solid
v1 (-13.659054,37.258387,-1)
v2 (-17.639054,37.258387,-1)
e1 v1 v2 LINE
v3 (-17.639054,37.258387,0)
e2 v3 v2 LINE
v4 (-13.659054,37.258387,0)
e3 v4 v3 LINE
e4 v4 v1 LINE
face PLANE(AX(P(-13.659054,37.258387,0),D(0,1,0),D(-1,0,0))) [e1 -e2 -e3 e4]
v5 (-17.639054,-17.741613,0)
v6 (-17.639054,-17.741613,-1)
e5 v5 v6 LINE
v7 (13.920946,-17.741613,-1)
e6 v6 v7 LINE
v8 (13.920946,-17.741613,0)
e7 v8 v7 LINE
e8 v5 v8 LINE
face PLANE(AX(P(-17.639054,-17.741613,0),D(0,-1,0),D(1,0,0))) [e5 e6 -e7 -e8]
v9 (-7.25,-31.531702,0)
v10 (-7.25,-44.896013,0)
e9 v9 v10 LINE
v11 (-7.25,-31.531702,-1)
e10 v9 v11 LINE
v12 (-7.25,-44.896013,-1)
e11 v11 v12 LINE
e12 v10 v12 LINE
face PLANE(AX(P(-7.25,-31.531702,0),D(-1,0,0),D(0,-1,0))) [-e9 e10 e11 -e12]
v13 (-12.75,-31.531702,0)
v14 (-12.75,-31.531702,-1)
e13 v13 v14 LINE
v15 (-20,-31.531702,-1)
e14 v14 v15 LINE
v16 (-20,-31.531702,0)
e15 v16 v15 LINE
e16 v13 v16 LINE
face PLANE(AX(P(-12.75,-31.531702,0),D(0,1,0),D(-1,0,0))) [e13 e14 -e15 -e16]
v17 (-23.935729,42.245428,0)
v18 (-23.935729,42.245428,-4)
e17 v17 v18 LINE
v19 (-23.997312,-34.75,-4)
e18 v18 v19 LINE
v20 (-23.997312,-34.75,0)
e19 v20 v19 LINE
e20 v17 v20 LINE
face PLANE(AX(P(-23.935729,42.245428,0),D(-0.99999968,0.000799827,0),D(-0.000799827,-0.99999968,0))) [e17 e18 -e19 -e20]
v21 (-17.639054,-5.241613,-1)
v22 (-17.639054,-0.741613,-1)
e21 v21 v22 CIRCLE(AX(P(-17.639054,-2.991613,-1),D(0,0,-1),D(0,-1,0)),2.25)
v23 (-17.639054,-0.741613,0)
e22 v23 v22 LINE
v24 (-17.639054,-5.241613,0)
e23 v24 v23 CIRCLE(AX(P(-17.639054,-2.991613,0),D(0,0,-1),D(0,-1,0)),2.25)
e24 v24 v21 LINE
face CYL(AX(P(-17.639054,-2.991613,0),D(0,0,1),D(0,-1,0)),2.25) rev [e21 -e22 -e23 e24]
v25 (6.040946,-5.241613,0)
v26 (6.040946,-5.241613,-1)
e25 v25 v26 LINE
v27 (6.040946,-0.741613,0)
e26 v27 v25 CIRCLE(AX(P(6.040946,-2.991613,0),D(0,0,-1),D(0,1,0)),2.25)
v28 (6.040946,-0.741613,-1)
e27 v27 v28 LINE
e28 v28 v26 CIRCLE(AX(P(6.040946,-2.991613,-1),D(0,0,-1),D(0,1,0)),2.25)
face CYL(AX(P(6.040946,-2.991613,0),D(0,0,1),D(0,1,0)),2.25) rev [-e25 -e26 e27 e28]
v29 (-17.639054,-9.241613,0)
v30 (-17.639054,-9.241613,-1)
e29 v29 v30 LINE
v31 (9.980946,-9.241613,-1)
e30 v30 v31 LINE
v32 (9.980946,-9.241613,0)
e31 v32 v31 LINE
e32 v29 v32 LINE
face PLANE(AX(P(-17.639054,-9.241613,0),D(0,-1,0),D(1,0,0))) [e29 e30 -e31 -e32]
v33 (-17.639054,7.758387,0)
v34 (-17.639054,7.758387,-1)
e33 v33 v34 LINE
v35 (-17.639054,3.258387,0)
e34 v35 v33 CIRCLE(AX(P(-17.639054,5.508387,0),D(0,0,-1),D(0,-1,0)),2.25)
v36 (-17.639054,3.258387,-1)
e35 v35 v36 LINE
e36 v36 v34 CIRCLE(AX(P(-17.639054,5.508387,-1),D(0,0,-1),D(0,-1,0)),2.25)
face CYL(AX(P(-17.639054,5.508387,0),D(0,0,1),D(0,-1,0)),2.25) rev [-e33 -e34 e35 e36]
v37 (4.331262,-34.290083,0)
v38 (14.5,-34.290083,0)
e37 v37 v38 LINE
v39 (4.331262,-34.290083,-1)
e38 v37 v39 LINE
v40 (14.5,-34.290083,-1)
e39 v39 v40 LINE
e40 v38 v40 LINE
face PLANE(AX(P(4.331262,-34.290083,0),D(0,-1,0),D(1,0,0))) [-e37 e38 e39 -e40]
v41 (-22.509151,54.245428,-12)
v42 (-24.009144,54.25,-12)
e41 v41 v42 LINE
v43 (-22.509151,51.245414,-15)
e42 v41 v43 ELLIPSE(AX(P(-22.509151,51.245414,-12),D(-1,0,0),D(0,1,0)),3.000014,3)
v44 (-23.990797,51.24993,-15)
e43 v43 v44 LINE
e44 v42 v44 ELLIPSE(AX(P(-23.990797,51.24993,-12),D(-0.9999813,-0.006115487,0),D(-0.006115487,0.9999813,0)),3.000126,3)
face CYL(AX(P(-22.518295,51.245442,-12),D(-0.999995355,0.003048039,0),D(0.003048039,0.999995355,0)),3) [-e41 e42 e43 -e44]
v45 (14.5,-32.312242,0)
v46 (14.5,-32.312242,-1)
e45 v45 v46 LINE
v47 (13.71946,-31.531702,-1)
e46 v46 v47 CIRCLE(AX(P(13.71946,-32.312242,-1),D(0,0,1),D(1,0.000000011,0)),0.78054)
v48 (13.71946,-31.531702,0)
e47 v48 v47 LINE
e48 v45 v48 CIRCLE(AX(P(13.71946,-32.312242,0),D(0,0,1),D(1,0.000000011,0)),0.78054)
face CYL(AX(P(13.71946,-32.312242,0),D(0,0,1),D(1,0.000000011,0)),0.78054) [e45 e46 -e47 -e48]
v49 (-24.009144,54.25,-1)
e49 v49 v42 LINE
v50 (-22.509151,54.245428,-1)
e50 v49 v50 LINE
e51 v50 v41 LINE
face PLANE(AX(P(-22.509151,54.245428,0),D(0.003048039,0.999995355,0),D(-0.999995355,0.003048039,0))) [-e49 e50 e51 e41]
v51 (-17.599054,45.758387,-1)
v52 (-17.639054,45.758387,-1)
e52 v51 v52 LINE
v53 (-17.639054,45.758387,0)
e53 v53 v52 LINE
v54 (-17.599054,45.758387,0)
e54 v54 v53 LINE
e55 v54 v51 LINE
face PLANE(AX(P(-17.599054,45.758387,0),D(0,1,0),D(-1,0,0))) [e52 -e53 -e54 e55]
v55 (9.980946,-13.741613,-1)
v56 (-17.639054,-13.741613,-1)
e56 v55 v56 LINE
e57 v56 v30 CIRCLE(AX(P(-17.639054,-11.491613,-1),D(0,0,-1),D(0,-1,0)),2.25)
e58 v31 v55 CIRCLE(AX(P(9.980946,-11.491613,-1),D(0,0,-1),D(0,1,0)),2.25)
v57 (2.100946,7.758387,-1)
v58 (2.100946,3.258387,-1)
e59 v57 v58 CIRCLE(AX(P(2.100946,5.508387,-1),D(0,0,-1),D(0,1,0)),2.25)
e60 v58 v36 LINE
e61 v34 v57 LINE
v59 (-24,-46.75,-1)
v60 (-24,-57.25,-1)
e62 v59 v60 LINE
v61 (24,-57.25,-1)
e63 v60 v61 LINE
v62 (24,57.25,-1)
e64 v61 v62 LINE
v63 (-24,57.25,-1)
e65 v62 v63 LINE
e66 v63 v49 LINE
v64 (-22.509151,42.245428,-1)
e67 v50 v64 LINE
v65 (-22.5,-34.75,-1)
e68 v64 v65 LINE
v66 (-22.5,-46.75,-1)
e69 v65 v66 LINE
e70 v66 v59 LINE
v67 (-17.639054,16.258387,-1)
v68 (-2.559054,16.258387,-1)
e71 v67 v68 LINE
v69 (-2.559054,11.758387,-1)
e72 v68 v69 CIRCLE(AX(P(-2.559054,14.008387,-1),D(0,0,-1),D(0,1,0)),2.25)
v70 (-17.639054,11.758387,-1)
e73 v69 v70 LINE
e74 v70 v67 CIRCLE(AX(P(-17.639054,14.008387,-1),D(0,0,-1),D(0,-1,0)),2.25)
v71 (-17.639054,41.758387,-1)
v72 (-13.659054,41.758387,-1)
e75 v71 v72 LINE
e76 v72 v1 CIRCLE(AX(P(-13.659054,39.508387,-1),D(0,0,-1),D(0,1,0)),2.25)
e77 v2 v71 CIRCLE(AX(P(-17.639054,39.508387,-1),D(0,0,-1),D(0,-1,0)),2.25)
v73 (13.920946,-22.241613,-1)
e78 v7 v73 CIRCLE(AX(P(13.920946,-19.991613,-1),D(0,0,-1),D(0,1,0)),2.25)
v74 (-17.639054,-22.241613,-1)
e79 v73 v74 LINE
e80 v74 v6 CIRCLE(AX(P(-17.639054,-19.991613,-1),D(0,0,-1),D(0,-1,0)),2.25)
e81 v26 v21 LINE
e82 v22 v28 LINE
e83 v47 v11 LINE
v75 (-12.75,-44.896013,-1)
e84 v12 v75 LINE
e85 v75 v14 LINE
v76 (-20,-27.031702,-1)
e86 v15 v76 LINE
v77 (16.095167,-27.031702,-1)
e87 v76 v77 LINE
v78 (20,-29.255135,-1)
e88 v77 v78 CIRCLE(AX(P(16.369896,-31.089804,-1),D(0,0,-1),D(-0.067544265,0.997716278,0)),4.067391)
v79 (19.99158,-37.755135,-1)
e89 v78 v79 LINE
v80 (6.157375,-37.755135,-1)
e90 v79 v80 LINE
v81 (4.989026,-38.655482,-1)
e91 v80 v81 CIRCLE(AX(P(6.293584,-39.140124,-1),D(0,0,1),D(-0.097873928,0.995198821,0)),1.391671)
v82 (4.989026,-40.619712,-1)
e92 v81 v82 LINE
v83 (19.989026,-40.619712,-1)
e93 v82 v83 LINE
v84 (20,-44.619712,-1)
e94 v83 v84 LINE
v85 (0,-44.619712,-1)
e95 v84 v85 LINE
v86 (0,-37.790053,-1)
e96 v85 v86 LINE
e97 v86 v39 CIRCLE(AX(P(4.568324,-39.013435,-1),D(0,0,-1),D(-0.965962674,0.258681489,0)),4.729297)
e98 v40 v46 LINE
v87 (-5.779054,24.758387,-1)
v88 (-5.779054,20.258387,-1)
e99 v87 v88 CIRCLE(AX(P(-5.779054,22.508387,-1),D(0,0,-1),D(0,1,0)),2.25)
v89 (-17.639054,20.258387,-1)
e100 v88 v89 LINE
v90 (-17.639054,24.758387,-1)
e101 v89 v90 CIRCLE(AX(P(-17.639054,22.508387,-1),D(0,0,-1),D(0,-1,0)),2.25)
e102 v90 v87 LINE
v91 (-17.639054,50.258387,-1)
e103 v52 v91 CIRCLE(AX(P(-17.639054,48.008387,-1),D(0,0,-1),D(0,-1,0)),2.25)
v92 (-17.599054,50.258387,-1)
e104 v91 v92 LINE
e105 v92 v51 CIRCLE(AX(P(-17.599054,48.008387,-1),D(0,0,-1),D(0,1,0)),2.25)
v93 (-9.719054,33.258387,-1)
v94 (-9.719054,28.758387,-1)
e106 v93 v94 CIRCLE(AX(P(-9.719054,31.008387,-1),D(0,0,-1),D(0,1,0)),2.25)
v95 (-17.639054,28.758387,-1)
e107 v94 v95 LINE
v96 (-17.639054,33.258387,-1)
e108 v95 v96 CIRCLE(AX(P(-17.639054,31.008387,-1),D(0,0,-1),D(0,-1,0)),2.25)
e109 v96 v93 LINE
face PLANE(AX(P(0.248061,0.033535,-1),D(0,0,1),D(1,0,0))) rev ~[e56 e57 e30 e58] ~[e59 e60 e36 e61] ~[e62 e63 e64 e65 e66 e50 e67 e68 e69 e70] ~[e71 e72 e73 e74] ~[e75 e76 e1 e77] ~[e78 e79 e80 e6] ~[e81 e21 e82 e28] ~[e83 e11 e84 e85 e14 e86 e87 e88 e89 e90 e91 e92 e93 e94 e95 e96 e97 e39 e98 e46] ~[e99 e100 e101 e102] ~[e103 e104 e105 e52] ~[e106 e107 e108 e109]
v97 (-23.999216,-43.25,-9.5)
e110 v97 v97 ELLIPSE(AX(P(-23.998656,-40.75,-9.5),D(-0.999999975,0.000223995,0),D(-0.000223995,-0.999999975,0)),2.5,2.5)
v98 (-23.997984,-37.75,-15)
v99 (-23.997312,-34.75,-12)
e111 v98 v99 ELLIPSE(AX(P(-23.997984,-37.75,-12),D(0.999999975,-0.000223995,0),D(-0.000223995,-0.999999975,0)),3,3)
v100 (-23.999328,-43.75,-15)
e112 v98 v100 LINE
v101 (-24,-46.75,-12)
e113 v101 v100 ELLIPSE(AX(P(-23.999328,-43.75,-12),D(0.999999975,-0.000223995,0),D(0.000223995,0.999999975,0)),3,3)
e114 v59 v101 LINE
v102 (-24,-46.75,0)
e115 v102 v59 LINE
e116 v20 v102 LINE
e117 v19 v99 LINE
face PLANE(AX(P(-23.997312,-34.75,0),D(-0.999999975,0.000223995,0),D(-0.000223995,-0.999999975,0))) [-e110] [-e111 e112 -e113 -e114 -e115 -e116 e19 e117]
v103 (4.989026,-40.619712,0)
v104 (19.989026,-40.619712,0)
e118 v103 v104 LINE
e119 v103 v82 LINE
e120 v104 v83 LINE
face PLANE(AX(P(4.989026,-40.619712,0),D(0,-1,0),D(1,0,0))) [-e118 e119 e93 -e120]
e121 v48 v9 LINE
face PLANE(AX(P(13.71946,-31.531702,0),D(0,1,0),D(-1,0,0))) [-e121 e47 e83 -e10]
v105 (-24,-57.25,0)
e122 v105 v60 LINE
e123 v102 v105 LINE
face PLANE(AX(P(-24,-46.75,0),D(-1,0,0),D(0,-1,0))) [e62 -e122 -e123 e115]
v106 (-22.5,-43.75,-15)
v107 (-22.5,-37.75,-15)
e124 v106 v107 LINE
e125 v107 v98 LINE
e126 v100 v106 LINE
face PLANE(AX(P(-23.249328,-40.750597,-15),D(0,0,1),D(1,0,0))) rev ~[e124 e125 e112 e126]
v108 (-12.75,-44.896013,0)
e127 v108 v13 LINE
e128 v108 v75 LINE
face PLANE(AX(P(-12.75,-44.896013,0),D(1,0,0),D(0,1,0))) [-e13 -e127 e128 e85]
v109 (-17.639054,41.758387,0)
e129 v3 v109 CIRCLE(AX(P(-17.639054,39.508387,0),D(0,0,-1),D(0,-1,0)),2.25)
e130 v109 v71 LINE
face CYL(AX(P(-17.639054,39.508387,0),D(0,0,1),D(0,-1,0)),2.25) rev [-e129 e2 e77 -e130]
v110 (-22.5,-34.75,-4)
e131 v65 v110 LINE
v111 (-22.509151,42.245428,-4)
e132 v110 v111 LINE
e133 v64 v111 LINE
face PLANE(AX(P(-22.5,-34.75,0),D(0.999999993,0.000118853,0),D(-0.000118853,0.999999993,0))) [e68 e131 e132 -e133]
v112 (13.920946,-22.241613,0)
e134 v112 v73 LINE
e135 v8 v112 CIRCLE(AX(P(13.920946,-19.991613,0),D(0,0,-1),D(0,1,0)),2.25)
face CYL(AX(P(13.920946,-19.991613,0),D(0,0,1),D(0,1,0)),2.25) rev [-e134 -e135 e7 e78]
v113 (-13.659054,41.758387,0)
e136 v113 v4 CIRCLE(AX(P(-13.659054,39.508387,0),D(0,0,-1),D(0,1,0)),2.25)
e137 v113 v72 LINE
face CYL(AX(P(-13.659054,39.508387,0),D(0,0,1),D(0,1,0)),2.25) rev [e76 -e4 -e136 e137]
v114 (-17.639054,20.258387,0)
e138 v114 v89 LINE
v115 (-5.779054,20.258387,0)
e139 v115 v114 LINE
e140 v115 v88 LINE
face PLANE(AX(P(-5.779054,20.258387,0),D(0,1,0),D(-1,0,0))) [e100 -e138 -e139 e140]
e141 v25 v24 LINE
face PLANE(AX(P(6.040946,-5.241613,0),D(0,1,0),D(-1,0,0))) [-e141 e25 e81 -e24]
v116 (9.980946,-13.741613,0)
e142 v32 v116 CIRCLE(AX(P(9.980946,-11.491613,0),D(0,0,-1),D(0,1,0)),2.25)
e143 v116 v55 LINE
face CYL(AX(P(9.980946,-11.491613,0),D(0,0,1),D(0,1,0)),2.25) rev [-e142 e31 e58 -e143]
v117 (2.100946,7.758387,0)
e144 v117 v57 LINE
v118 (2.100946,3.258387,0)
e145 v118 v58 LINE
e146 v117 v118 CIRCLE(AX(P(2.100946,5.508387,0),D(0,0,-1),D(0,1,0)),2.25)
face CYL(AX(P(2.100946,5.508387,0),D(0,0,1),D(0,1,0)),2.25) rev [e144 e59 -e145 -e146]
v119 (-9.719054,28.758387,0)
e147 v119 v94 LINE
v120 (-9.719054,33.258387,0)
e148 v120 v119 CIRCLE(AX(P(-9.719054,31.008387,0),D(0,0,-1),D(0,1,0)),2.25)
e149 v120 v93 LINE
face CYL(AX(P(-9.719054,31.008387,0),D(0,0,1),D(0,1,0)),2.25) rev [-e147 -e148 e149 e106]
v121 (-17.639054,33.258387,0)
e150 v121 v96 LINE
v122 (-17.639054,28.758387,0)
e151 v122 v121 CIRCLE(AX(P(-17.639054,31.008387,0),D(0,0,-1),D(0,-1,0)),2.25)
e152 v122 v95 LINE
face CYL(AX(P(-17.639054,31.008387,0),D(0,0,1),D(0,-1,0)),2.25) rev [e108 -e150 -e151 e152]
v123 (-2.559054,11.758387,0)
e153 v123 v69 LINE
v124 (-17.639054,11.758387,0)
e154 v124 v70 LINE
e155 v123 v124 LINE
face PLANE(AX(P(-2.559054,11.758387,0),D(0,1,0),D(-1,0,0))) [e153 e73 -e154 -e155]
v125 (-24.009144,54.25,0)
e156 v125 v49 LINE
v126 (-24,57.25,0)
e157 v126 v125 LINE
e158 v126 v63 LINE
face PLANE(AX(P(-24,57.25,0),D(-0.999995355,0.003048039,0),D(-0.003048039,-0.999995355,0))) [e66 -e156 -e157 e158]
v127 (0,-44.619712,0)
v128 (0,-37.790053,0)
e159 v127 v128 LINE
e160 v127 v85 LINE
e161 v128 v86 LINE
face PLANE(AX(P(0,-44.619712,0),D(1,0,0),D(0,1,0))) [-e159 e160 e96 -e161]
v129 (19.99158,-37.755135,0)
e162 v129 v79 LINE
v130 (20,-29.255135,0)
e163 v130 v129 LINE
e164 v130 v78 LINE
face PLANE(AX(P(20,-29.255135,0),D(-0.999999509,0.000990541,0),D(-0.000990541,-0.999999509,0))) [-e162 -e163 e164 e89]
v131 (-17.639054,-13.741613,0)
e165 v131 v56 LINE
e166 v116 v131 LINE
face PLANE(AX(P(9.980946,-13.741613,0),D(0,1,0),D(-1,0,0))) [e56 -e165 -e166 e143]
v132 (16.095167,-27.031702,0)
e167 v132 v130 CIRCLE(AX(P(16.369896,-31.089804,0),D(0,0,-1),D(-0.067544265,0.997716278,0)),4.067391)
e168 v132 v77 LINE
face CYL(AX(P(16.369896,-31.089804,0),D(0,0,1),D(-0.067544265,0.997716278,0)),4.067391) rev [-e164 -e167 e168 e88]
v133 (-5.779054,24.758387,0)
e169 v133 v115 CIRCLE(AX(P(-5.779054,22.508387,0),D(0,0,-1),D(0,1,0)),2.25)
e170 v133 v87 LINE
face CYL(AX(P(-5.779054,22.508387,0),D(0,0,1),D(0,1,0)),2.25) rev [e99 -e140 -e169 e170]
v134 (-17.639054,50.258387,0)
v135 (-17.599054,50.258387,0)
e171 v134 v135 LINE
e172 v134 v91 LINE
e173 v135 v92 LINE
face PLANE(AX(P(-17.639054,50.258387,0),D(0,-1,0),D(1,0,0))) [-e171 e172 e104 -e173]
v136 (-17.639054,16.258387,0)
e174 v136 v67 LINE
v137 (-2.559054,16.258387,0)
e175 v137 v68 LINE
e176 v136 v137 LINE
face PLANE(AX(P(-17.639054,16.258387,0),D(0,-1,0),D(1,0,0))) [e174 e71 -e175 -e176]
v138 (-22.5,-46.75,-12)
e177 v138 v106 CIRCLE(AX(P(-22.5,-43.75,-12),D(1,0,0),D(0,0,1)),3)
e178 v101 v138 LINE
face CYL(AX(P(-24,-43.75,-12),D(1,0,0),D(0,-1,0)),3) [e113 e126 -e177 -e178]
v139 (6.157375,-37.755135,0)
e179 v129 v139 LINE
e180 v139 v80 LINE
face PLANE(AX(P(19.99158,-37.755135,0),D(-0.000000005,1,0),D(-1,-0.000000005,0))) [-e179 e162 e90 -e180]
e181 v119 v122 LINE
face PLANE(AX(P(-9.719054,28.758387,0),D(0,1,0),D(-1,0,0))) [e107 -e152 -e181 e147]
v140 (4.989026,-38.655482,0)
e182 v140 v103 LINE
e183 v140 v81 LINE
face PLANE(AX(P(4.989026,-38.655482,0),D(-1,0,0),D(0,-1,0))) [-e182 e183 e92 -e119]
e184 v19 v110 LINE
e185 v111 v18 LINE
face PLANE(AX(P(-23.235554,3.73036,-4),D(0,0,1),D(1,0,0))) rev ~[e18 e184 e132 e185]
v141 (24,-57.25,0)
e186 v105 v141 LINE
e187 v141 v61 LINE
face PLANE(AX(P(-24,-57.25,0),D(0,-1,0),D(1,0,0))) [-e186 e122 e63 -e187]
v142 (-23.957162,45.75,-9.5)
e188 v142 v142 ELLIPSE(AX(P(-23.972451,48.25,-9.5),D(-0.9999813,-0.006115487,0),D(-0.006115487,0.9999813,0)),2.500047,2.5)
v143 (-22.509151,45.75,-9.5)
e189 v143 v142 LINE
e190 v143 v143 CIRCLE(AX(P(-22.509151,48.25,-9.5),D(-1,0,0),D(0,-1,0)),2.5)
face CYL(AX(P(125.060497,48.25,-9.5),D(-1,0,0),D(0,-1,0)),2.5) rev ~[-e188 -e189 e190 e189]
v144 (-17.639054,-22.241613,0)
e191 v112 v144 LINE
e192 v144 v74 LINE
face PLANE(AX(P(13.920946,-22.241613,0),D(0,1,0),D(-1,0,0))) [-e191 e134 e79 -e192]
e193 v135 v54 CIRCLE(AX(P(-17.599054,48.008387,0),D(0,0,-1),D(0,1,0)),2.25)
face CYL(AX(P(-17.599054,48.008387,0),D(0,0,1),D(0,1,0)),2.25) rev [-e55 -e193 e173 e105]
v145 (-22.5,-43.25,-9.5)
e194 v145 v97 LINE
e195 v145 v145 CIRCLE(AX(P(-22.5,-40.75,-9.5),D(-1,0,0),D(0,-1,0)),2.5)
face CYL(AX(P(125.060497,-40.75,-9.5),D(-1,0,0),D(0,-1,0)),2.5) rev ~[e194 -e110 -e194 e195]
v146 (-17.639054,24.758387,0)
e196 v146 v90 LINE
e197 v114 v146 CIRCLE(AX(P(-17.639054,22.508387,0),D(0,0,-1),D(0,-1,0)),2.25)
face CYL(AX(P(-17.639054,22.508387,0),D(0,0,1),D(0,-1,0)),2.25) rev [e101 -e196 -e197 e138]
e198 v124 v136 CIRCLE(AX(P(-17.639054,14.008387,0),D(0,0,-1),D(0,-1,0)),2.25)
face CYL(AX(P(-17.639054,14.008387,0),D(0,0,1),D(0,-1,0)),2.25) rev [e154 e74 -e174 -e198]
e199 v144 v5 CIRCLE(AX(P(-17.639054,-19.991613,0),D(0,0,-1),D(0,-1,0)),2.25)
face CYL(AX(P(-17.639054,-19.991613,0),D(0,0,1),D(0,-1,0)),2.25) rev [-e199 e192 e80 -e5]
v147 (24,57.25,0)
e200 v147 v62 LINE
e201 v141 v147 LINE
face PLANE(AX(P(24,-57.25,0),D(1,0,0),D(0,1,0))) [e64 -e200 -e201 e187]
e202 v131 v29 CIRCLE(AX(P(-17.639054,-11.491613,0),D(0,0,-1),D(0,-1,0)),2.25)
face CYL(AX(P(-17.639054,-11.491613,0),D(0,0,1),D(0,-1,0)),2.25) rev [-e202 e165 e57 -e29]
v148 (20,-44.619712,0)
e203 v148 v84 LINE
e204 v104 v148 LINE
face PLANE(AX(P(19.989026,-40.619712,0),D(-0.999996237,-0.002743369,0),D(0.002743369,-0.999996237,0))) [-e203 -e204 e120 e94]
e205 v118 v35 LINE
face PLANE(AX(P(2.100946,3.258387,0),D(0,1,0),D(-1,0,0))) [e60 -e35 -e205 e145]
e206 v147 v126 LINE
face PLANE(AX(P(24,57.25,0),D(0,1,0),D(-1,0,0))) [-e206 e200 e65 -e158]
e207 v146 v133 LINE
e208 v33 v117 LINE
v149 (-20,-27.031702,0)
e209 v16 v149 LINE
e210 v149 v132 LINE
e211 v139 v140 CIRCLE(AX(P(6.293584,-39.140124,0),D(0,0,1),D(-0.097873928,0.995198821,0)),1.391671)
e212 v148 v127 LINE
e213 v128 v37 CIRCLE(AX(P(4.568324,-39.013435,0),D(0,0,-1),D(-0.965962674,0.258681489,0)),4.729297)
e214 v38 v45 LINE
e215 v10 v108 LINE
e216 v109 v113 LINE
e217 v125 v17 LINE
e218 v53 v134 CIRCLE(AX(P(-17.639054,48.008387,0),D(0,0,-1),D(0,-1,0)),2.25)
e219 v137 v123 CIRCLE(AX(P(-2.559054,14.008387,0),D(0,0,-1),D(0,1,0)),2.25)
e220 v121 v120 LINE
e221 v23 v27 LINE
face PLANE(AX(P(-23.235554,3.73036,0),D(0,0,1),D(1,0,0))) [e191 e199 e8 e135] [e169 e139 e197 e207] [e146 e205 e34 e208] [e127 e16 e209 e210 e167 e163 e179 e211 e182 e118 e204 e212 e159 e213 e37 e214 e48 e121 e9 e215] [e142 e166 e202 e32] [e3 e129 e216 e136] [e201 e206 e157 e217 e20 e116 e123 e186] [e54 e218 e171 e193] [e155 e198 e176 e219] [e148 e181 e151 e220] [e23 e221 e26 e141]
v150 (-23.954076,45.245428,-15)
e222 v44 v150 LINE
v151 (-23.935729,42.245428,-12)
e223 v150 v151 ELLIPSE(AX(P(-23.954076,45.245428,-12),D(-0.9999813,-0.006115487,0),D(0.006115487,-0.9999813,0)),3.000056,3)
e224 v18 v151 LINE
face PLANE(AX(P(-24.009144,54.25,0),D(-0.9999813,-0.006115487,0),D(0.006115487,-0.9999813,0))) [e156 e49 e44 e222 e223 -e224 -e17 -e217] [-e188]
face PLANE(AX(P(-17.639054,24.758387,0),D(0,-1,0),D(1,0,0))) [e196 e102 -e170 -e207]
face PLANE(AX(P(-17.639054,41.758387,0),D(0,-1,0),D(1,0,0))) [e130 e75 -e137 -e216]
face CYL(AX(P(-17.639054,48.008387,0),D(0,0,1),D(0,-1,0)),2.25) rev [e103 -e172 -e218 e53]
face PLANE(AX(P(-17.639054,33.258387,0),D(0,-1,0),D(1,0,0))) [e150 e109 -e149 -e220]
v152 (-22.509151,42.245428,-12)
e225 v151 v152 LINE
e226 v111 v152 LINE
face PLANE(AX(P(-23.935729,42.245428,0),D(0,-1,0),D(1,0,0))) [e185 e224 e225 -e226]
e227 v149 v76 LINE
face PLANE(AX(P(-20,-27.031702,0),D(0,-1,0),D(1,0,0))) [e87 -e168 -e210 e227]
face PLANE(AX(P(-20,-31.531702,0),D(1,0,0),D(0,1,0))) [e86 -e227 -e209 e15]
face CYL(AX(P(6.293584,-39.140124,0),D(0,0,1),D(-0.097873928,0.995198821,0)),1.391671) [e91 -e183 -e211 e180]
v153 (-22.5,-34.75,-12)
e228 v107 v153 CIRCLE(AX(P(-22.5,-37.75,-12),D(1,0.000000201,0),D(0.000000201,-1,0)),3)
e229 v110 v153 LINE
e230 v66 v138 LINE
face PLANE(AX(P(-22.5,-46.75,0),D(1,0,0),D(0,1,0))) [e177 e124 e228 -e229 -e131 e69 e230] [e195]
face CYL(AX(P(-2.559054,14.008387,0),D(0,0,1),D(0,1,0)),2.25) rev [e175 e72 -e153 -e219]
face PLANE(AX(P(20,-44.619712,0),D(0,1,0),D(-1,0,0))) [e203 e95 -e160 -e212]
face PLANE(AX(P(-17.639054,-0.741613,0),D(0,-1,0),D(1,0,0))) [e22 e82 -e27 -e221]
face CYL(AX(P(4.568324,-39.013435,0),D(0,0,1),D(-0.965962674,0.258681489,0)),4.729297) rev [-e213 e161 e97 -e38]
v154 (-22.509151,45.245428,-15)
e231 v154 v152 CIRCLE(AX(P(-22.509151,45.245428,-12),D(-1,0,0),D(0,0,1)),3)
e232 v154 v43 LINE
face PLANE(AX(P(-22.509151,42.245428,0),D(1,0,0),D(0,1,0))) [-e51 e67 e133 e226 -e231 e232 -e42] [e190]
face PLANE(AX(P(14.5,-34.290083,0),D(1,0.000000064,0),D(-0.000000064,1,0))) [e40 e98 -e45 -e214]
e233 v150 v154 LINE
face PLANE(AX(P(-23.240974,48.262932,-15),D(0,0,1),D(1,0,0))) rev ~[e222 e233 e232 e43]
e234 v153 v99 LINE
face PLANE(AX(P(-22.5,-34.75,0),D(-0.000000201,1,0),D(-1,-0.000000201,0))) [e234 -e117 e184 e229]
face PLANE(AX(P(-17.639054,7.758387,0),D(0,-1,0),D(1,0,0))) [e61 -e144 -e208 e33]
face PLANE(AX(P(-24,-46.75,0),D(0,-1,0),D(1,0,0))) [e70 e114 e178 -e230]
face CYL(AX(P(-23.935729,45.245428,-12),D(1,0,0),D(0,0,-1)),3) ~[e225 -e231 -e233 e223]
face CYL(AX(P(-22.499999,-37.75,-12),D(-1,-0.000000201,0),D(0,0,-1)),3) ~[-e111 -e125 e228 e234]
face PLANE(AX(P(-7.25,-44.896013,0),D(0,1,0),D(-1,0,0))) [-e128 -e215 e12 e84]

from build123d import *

# Parameters (mm, degrees)
F1_DEPTH = 1
F2_DEPTH = 15
F4_D     = 5
F5_R     = 3
F6_DEPTH = 4


# Not quite as in the source:
# - a feature names something its author has since deleted; it is built from what else it names


with BuildPart() as f1:
    # F0 (on Top) → F1 (new body)
    with BuildSketch(Plane.XY):
        Polygon((24, 57.25), (-24, 57.25), (-24.0091441598, 54.25), (-22.5091511277, 54.2454279414), (-22.5091511277, 42.2454279414), (-22.5, -34.75), (-22.5, -46.75), (-24, -46.75), (-24, -57.25), (24, -57.25), align=None)
        with BuildLine():
            Line((13.9209458456, -22.2416133583), (-17.6390541544, -22.2416133583))
            ThreePointArc((-17.6390541544, -22.2416133583), (-19.8890541544, -19.9916133583), (-17.6390541544, -17.7416133583))
            Line((-17.6390541544, -17.7416133583), (13.9209458456, -17.7416133583))
            ThreePointArc((13.9209458456, -17.7416133583), (16.1709458456, -19.9916133583), (13.9209458456, -22.2416133583))
        make_face(mode=Mode.SUBTRACT)
        with BuildLine():
            Line((9.9809458456, -13.7416133583), (-17.6390541544, -13.7416133583))
            ThreePointArc((-17.6390541544, -13.7416133583), (-19.8890541544, -11.4916133583), (-17.6390541544, -9.2416133583))
            Line((-17.6390541544, -9.2416133583), (9.9809458456, -9.2416133583))
            ThreePointArc((9.9809458456, -9.2416133583), (12.2309458456, -11.4916133583), (9.9809458456, -13.7416133583))
        make_face(mode=Mode.SUBTRACT)
        with BuildLine():
            Line((6.0409458456, -5.2416133583), (-17.6390541544, -5.2416133583))
            ThreePointArc((-17.6390541544, -5.2416133583), (-19.8890541544, -2.9916133583), (-17.6390541544, -0.7416133583))
            Line((-17.6390541544, -0.7416133583), (6.0409458456, -0.7416133583))
            ThreePointArc((6.0409458456, -0.7416133583), (8.2909458456, -2.9916133583), (6.0409458456, -5.2416133583))
        make_face(mode=Mode.SUBTRACT)
        with BuildLine():
            Line((-19.9999999992, -31.5317022603), (-19.9999999992, -27.0317022603))
            Line((-19.9999999992, -27.0317022603), (16.0951670268, -27.0317022603))
            ThreePointArc((16.0951670268, -27.0317022603), (18.3824934665, -27.555243649), (19.9999999704, -29.25513498))
            Line((19.9999999704, -29.25513498), (19.991580365, -37.75513498))
            Line((19.991580365, -37.75513498), (6.1573753969, -37.7551350426))
            ThreePointArc((6.1573753969, -37.7551350426), (5.4441089744, -38.037790108), (4.9890264818, -38.6554816172))
            Line((4.9890264818, -38.6554816172), (4.9890264818, -40.6197120801))
            Line((4.9890264818, -40.6197120801), (19.9890264818, -40.6197120801))
            Line((19.9890264818, -40.6197120801), (20, -44.6197120801))
            Line((20, -44.6197120801), (0, -44.6197120801))
            Line((0, -44.6197120801), (0, -37.7900532508))
            ThreePointArc((0, -37.7900532508), (1.5958871284, -35.3350022858), (4.3312619815, -34.2900834468))
            Line((4.3312619815, -34.2900834468), (14.5000001306, -34.2900834468))
            Line((14.5000001306, -34.2900834468), (14.5000000048, -32.3122422563))
            ThreePointArc((14.5000000048, -32.3122422563), (14.2713851276, -31.7603171319), (13.7194600008, -31.5317022603))
            Line((13.7194600008, -31.5317022603), (-7.2499999992, -31.5317022603))
            Line((-7.2499999992, -31.5317022603), (-7.2499999992, -44.8960133593))
            Line((-7.2499999992, -44.8960133593), (-12.7499999992, -44.8960133593))
            Line((-12.7499999992, -44.8960133593), (-12.7499999992, -31.5317022603))
            Line((-12.7499999992, -31.5317022603), (-19.9999999992, -31.5317022603))
        make_face(mode=Mode.SUBTRACT)
        with BuildLine():
            Line((2.1009458456, 3.2583866417), (-17.6390541544, 3.2583866417))
            ThreePointArc((-17.6390541544, 3.2583866417), (-19.8890541544, 5.5083866417), (-17.6390541544, 7.7583866417))
            Line((-17.6390541544, 7.7583866417), (2.1009458456, 7.7583866417))
            ThreePointArc((2.1009458456, 7.7583866417), (4.3509458456, 5.5083866417), (2.1009458456, 3.2583866417))
        make_face(mode=Mode.SUBTRACT)
        with BuildLine():
            Line((-2.5590541544, 11.7583866417), (-17.6390541544, 11.7583866417))
            ThreePointArc((-17.6390541544, 11.7583866417), (-19.8890541544, 14.0083866417), (-17.6390541544, 16.2583866417))
            Line((-17.6390541544, 16.2583866417), (-2.5590541544, 16.2583866417))
            ThreePointArc((-2.5590541544, 16.2583866417), (-0.3090541544, 14.0083866417), (-2.5590541544, 11.7583866417))
        make_face(mode=Mode.SUBTRACT)
        with BuildLine():
            Line((-5.7790541544, 20.2583866417), (-17.6390541544, 20.2583866417))
            ThreePointArc((-17.6390541544, 20.2583866417), (-19.8890541544, 22.5083866417), (-17.6390541544, 24.7583866417))
            Line((-17.6390541544, 24.7583866417), (-5.7790541544, 24.7583866417))
            ThreePointArc((-5.7790541544, 24.7583866417), (-3.5290541544, 22.5083866417), (-5.7790541544, 20.2583866417))
        make_face(mode=Mode.SUBTRACT)
        with BuildLine():
            Line((-9.7190541544, 28.7583866417), (-17.6390541544, 28.7583866417))
            ThreePointArc((-17.6390541544, 28.7583866417), (-19.8890541544, 31.0083866417), (-17.6390541544, 33.2583866417))
            Line((-17.6390541544, 33.2583866417), (-9.7190541544, 33.2583866417))
            ThreePointArc((-9.7190541544, 33.2583866417), (-7.4690541544, 31.0083866417), (-9.7190541544, 28.7583866417))
        make_face(mode=Mode.SUBTRACT)
        with BuildLine():
            Line((-13.6590541544, 37.2583866417), (-17.6390541544, 37.2583866417))
            ThreePointArc((-17.6390541544, 37.2583866417), (-19.8890541544, 39.5083866417), (-17.6390541544, 41.7583866417))
            Line((-17.6390541544, 41.7583866417), (-13.6590541544, 41.7583866417))
            ThreePointArc((-13.6590541544, 41.7583866417), (-11.4090541544, 39.5083866417), (-13.6590541544, 37.2583866417))
        make_face(mode=Mode.SUBTRACT)
        with BuildLine():
            Line((-17.5990541544, 45.7583866417), (-17.6390541544, 45.7583866417))
            ThreePointArc((-17.6390541544, 45.7583866417), (-19.8890541544, 48.0083866417), (-17.6390541544, 50.2583866417))
            Line((-17.6390541544, 50.2583866417), (-17.5990541544, 50.2583866417))
            ThreePointArc((-17.5990541544, 50.2583866417), (-15.3490541544, 48.0083866417), (-17.5990541544, 45.7583866417))
        make_face(mode=Mode.SUBTRACT)
    extrude(amount=-F1_DEPTH)

    # F0 (on Top) → F2 (join)
    with BuildSketch(Plane.XY):
        Polygon((-22.5091511277, 54.2454279414), (-24.0091441598, 54.25), (-23.9357289877, 42.2454279414), (-22.5091511277, 42.2454279414), align=None)
        Polygon((-22.5, -34.75), (-23.997312058, -34.750000301), (-24, -46.75), (-22.5, -46.75), align=None)
    extrude(amount=-F2_DEPTH)

    # F4 (through all)
    with Locations(Plane.YZ):
        with Locations((-40.75, -9.5), (48.25, -9.5)):
            Hole(F4_D / 2)

    # F5
    f5_edges = [f1.edges().sort_by_distance(p)[0] for p in [
        (-23.22244, 42.245428, -15),
        (-23.259148, 54.247714, -15),
        (-23.248656, -34.75, -15),
        (-23.25, -46.75, -15),
    ]]
    fillet(f5_edges, radius=F5_R)

    # F0 (on Top) → F6 (join)
    with BuildSketch(Plane.XY):
        Polygon((-22.5091511277, 42.2454279414), (-23.9357289877, 42.2454279414), (-23.997312058, -34.750000301), (-22.5, -34.75), align=None)
    extrude(amount=-F6_DEPTH)


solid = f1.part
